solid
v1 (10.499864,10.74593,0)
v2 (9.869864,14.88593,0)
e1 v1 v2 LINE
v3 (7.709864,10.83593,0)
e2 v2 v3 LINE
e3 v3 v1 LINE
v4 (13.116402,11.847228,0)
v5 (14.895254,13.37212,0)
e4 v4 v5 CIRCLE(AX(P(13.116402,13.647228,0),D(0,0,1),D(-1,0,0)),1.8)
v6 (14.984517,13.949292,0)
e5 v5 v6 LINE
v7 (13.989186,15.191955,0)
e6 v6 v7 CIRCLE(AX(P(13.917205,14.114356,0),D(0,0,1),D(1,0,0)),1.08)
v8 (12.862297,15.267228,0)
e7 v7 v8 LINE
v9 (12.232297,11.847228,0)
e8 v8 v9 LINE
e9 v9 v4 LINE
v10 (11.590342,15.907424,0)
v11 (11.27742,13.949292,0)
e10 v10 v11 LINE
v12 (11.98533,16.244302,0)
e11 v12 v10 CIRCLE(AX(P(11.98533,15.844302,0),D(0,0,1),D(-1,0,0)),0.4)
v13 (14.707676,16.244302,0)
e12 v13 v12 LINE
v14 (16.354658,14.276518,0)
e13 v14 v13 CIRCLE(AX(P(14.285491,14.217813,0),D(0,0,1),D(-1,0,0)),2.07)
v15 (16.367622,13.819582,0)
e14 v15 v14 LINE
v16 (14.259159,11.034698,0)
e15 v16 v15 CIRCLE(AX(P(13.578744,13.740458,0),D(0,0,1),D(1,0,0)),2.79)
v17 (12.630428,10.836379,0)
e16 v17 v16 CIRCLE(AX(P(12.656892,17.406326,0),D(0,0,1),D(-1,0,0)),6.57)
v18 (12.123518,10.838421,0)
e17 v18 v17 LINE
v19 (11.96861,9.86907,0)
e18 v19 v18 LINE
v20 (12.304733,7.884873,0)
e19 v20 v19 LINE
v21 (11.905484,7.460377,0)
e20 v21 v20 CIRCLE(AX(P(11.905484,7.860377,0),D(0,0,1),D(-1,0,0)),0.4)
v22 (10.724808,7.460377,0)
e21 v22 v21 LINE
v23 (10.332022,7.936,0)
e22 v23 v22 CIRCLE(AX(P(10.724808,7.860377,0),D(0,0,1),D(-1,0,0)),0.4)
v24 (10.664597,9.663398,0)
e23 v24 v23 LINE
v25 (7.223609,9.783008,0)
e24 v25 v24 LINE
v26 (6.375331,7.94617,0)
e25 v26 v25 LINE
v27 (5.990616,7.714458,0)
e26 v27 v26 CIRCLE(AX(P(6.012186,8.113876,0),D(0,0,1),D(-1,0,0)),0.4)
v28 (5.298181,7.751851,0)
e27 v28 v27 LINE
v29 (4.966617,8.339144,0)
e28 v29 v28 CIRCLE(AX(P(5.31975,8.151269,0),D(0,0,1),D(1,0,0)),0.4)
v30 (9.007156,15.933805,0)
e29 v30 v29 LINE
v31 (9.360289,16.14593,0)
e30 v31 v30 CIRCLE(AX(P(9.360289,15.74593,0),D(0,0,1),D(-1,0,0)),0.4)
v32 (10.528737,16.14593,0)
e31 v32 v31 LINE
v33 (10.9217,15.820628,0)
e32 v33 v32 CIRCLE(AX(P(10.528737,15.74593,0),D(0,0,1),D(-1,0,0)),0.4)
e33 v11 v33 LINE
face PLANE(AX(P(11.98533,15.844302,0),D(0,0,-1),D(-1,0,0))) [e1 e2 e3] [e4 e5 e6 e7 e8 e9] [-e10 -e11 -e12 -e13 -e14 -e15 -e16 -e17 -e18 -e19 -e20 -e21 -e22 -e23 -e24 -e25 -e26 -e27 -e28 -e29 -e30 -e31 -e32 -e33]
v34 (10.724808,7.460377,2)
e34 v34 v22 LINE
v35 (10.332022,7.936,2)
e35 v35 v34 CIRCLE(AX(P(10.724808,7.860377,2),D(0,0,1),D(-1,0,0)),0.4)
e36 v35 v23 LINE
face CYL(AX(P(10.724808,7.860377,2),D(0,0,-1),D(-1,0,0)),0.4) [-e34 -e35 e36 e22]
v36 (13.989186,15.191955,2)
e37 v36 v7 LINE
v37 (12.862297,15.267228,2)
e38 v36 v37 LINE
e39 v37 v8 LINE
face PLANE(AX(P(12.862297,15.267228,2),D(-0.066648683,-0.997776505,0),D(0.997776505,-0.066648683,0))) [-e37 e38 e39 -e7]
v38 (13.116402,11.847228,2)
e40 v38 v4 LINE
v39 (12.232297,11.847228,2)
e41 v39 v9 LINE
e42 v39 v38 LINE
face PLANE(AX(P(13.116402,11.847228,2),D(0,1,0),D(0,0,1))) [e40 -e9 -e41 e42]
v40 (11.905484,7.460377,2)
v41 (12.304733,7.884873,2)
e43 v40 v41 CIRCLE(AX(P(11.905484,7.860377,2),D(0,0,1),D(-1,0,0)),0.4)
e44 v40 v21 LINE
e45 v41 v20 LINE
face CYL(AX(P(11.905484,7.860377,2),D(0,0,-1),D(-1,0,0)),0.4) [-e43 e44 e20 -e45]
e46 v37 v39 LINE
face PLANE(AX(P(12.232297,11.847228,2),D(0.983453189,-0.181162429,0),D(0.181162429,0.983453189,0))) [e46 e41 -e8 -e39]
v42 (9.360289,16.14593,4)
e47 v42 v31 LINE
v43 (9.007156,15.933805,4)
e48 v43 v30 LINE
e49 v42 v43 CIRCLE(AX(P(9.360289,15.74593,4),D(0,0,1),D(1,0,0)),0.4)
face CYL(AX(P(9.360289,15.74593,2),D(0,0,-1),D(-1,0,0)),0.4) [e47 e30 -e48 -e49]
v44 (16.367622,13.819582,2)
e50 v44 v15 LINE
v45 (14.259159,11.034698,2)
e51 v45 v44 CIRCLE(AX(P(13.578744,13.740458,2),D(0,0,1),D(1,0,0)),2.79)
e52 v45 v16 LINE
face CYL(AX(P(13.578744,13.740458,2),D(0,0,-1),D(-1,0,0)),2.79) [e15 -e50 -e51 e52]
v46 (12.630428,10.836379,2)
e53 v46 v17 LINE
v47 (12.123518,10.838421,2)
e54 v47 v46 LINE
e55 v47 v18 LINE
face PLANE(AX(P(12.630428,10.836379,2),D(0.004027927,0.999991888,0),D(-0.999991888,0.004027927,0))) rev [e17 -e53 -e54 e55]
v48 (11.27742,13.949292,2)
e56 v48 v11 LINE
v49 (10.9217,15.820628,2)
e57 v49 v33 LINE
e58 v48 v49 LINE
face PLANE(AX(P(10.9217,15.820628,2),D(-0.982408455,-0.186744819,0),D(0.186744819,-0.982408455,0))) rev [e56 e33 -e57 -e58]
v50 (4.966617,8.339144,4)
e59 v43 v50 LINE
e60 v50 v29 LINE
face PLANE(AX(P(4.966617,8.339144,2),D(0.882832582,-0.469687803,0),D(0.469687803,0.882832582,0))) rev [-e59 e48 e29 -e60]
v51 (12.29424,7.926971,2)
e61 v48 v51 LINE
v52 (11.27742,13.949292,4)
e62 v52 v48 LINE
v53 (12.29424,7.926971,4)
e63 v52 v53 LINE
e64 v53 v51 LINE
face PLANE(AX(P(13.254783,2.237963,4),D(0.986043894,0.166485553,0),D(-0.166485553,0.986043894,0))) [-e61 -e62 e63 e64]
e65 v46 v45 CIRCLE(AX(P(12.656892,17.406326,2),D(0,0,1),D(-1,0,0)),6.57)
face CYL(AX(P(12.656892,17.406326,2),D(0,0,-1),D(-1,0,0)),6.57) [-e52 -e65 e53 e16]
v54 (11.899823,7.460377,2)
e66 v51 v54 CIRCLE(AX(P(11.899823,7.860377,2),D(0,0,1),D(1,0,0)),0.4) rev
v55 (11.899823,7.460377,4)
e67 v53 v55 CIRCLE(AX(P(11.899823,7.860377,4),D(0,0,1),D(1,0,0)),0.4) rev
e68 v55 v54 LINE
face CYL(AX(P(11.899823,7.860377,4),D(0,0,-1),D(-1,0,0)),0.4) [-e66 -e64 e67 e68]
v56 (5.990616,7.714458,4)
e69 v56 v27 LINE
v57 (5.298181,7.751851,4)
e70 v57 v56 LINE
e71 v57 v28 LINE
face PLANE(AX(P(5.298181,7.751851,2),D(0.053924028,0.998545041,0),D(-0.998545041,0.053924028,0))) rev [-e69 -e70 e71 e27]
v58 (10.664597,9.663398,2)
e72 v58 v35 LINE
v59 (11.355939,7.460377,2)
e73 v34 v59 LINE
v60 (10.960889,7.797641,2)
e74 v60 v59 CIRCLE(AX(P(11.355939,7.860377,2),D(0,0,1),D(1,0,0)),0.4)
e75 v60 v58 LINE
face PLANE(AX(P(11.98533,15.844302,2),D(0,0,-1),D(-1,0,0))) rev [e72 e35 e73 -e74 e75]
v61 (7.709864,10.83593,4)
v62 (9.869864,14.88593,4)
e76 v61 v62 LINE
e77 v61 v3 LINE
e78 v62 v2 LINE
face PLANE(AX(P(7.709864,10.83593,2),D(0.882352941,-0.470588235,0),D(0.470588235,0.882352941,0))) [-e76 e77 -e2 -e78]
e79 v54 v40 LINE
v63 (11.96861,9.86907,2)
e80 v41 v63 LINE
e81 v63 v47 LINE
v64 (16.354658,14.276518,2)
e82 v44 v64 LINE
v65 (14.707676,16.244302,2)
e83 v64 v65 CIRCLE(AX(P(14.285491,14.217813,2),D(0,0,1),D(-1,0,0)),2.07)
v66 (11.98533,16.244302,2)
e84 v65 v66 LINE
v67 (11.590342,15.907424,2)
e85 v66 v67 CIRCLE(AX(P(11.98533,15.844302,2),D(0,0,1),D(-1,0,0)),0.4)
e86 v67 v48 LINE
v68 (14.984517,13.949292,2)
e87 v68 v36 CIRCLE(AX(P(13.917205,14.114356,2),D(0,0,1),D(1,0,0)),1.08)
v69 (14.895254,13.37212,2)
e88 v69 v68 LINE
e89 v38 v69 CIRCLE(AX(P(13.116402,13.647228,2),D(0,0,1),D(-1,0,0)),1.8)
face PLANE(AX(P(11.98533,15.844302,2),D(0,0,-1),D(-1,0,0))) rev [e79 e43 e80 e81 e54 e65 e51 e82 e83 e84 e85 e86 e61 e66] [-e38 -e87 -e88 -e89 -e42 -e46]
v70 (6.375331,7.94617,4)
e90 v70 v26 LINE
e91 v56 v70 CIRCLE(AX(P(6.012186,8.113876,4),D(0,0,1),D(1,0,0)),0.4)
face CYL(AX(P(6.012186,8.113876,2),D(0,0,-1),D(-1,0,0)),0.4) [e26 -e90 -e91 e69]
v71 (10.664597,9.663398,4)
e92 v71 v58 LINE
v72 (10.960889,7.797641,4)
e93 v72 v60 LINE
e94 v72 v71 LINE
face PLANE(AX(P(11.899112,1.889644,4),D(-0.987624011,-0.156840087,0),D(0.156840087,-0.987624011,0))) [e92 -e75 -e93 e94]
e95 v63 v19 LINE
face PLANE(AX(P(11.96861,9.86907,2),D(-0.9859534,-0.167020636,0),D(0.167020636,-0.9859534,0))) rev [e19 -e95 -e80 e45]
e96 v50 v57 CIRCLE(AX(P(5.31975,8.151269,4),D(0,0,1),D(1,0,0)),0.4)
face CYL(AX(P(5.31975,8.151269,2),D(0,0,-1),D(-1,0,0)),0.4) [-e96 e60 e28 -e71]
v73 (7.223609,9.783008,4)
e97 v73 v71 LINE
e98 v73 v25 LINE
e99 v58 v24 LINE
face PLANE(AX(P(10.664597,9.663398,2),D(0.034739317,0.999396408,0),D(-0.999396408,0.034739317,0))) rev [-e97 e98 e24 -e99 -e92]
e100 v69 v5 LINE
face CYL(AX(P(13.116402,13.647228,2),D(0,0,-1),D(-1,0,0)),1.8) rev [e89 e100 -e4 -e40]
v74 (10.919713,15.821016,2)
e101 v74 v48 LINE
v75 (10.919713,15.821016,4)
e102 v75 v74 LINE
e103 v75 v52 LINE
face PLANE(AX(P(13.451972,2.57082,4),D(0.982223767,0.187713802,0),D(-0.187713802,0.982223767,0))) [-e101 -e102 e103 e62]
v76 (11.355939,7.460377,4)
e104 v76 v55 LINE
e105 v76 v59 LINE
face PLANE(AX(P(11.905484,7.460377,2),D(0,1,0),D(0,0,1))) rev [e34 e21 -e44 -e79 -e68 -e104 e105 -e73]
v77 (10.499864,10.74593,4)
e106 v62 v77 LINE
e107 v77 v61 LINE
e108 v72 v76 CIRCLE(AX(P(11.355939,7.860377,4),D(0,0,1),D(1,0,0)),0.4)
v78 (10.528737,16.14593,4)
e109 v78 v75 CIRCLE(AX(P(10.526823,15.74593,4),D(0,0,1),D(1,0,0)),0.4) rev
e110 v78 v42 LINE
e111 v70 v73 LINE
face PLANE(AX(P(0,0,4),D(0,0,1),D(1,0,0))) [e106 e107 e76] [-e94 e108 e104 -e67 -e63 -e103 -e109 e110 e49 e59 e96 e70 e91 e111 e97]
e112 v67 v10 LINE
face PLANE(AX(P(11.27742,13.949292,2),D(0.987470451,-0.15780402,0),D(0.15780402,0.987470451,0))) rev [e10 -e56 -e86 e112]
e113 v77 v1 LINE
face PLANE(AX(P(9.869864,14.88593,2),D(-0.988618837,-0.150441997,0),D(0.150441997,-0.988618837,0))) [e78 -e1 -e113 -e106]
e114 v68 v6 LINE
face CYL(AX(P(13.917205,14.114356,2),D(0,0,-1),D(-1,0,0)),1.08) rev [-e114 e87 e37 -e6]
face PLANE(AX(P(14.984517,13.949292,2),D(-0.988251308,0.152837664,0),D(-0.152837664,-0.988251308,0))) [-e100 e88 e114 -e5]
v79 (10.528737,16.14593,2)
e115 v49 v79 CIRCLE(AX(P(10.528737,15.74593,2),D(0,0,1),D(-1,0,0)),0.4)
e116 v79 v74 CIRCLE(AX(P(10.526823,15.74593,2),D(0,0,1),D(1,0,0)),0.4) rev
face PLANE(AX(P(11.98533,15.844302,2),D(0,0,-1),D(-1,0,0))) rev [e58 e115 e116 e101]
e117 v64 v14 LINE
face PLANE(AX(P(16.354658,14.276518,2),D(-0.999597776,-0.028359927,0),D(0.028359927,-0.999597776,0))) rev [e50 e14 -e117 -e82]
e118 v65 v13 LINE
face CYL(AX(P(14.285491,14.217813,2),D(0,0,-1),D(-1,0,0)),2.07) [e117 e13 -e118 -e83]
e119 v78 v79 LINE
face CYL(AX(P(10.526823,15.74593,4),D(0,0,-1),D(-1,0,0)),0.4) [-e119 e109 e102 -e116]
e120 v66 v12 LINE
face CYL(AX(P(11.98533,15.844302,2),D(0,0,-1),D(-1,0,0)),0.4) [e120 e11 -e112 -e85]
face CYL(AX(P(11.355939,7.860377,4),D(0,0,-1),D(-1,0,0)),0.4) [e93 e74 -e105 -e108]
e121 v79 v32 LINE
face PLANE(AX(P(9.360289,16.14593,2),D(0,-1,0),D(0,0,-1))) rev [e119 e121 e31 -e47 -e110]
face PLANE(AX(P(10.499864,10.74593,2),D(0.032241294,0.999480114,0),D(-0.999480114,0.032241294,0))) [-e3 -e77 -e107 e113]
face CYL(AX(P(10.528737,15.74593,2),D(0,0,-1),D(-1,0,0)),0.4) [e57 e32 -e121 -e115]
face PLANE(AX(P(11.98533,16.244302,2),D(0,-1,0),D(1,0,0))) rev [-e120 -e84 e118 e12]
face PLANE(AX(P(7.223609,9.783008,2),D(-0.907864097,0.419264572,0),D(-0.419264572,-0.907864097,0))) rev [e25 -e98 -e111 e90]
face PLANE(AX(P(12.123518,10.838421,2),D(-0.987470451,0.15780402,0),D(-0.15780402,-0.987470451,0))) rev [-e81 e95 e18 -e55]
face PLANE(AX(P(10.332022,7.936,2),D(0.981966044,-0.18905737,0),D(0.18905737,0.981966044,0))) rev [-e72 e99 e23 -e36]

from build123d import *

# Parameters (mm, degrees)
BOSS_EXTRUDE1_DEPTH = 2
BOSS_EXTRUDE3_DEPTH = 2


# Read off the part's stored shape, not the designer's step: Boss-Extrude3
with BuildPart() as part:
    # Sketch1 → Boss-Extrude1 (new body)
    with BuildSketch(Plane.XY):
        with BuildLine():
            Line((10.921700045, 15.820627971), (11.277420096, 13.949291525))
            Line((11.277420096, 13.949291525), (11.590342055, 15.907424067))
            ThreePointArc((11.590342055, 15.907424067), (11.725761981, 16.148644901), (11.985330235, 16.244302459))
            Line((11.985330235, 16.244302459), (14.707676179, 16.244302459))
            ThreePointArc((14.707676179, 16.244302459), (15.872864002, 15.546401169), (16.35465827, 14.27651804))
            Line((16.35465827, 14.27651804), (16.367622155, 13.819582081))
            ThreePointArc((16.367622155, 13.819582081), (15.803130226, 12.056353518), (14.259159222, 11.034698173))
            ThreePointArc((14.259159222, 11.034698173), (13.45100908, 10.884495001), (12.630428485, 10.836379176))
            Line((12.630428485, 10.836379176), (12.123518451, 10.838420989))
            Line((12.123518451, 10.838420989), (11.968610095, 9.869070376))
            Line((11.968610095, 9.869070376), (12.30473343, 7.884872777))
            ThreePointArc((12.30473343, 7.884872777), (12.19685885, 7.586331563), (11.905484198, 7.460376837))
            Line((11.905484198, 7.460376837), (10.999839261, 7.460376837))
            Line((10.999839261, 7.460376837), (10.724808345, 7.460376837))
            ThreePointArc((10.724808345, 7.460376837), (10.4163856, 7.605670319), (10.332021927, 7.935999785))
            Line((10.332021927, 7.935999785), (10.664596921, 9.663397929))
            Line((10.664596921, 9.663397929), (7.22360923, 9.783007686))
            Line((7.22360923, 9.783007686), (6.375331355, 7.946169859))
            ThreePointArc((6.375331355, 7.946169859), (6.218562023, 7.771225984), (5.990616105, 7.714457672))
            Line((5.990616105, 7.714457672), (5.298180624, 7.751850988))
            ThreePointArc((5.298180624, 7.751850988), (4.97142736, 7.954619126), (4.966617202, 8.339144126))
            Line((4.966617202, 8.339144126), (9.007156407, 15.933805165))
            ThreePointArc((9.007156407, 15.933805165), (9.1543162, 16.08882219), (9.36028944, 16.145930044))
            Line((9.36028944, 16.145930044), (10.528736663, 16.145930044))
            ThreePointArc((10.528736663, 16.145930044), (10.783806094, 16.054052723), (10.921700045, 15.820627971))
        make_face()
        with BuildLine():
            Line((12.232297108, 11.847227843), (12.862297108, 15.267227843))
            Line((12.862297108, 15.267227843), (13.989185775, 15.191954828))
            ThreePointArc((13.989185775, 15.191954828), (14.760146227, 14.789523159), (14.98451661, 13.949291525))
            Line((14.98451661, 13.949291525), (14.895254355, 13.372120047))
            ThreePointArc((14.895254355, 13.372120047), (14.287898045, 12.28062731), (13.116402, 11.847227843))
            Line((13.116402, 11.847227843), (12.232297108, 11.847227843))
        make_face(mode=Mode.SUBTRACT)
        Polygon((9.869863773, 14.885930044), (10.499863773, 10.745930044), (7.709863773, 10.835930044), align=None, mode=Mode.SUBTRACT)
    extrude(amount=BOSS_EXTRUDE1_DEPTH)

    # Boss-Extrude3 outline → Boss-Extrude3 (add)
    with BuildSketch(Plane.XY.offset(2)):
        with BuildLine():
            Line((10.528736641, 16.145925468), (9.36028944, 16.145930044))
            ThreePointArc((9.36028944, 16.145930044), (9.1543162, 16.08882219), (9.007156407, 15.933805165))
            Line((9.007156407, 15.933805165), (4.966617202, 8.339144126))
            ThreePointArc((4.966617202, 8.339144126), (4.97142736, 7.954619126), (5.298180624, 7.751850988))
            Line((5.298180624, 7.751850988), (5.990616105, 7.714457672))
            ThreePointArc((5.990616105, 7.714457672), (6.218562023, 7.771225984), (6.375331355, 7.946169859))
            Line((6.375331355, 7.946169859), (7.22360923, 9.783007686))
            Line((7.22360923, 9.783007686), (10.664596921, 9.663397929))
            Line((10.664596921, 9.663397929), (10.960889342, 7.797640802))
            ThreePointArc((10.960889342, 7.797640802), (11.096222191, 7.556161112), (11.355938946, 7.460376837))
            Line((11.355938946, 7.460376837), (11.905483631, 7.460416896))
            ThreePointArc((11.905483631, 7.460416896), (12.207123715, 7.604318029), (12.294240301, 7.926971058))
            Line((12.294240301, 7.926971058), (11.277420096, 13.949291525))
            Line((11.277420096, 13.949291525), (10.919712975, 15.821015565))
            ThreePointArc((10.919712975, 15.821015565), (10.782477337, 16.05356798), (10.528736641, 16.145925468))
        make_face()
        Polygon((10.499863773, 10.745930044), (7.709863773, 10.835930044), (9.869863773, 14.885930044), align=None, mode=Mode.SUBTRACT)
    extrude(amount=BOSS_EXTRUDE3_DEPTH)


solid = part.part
